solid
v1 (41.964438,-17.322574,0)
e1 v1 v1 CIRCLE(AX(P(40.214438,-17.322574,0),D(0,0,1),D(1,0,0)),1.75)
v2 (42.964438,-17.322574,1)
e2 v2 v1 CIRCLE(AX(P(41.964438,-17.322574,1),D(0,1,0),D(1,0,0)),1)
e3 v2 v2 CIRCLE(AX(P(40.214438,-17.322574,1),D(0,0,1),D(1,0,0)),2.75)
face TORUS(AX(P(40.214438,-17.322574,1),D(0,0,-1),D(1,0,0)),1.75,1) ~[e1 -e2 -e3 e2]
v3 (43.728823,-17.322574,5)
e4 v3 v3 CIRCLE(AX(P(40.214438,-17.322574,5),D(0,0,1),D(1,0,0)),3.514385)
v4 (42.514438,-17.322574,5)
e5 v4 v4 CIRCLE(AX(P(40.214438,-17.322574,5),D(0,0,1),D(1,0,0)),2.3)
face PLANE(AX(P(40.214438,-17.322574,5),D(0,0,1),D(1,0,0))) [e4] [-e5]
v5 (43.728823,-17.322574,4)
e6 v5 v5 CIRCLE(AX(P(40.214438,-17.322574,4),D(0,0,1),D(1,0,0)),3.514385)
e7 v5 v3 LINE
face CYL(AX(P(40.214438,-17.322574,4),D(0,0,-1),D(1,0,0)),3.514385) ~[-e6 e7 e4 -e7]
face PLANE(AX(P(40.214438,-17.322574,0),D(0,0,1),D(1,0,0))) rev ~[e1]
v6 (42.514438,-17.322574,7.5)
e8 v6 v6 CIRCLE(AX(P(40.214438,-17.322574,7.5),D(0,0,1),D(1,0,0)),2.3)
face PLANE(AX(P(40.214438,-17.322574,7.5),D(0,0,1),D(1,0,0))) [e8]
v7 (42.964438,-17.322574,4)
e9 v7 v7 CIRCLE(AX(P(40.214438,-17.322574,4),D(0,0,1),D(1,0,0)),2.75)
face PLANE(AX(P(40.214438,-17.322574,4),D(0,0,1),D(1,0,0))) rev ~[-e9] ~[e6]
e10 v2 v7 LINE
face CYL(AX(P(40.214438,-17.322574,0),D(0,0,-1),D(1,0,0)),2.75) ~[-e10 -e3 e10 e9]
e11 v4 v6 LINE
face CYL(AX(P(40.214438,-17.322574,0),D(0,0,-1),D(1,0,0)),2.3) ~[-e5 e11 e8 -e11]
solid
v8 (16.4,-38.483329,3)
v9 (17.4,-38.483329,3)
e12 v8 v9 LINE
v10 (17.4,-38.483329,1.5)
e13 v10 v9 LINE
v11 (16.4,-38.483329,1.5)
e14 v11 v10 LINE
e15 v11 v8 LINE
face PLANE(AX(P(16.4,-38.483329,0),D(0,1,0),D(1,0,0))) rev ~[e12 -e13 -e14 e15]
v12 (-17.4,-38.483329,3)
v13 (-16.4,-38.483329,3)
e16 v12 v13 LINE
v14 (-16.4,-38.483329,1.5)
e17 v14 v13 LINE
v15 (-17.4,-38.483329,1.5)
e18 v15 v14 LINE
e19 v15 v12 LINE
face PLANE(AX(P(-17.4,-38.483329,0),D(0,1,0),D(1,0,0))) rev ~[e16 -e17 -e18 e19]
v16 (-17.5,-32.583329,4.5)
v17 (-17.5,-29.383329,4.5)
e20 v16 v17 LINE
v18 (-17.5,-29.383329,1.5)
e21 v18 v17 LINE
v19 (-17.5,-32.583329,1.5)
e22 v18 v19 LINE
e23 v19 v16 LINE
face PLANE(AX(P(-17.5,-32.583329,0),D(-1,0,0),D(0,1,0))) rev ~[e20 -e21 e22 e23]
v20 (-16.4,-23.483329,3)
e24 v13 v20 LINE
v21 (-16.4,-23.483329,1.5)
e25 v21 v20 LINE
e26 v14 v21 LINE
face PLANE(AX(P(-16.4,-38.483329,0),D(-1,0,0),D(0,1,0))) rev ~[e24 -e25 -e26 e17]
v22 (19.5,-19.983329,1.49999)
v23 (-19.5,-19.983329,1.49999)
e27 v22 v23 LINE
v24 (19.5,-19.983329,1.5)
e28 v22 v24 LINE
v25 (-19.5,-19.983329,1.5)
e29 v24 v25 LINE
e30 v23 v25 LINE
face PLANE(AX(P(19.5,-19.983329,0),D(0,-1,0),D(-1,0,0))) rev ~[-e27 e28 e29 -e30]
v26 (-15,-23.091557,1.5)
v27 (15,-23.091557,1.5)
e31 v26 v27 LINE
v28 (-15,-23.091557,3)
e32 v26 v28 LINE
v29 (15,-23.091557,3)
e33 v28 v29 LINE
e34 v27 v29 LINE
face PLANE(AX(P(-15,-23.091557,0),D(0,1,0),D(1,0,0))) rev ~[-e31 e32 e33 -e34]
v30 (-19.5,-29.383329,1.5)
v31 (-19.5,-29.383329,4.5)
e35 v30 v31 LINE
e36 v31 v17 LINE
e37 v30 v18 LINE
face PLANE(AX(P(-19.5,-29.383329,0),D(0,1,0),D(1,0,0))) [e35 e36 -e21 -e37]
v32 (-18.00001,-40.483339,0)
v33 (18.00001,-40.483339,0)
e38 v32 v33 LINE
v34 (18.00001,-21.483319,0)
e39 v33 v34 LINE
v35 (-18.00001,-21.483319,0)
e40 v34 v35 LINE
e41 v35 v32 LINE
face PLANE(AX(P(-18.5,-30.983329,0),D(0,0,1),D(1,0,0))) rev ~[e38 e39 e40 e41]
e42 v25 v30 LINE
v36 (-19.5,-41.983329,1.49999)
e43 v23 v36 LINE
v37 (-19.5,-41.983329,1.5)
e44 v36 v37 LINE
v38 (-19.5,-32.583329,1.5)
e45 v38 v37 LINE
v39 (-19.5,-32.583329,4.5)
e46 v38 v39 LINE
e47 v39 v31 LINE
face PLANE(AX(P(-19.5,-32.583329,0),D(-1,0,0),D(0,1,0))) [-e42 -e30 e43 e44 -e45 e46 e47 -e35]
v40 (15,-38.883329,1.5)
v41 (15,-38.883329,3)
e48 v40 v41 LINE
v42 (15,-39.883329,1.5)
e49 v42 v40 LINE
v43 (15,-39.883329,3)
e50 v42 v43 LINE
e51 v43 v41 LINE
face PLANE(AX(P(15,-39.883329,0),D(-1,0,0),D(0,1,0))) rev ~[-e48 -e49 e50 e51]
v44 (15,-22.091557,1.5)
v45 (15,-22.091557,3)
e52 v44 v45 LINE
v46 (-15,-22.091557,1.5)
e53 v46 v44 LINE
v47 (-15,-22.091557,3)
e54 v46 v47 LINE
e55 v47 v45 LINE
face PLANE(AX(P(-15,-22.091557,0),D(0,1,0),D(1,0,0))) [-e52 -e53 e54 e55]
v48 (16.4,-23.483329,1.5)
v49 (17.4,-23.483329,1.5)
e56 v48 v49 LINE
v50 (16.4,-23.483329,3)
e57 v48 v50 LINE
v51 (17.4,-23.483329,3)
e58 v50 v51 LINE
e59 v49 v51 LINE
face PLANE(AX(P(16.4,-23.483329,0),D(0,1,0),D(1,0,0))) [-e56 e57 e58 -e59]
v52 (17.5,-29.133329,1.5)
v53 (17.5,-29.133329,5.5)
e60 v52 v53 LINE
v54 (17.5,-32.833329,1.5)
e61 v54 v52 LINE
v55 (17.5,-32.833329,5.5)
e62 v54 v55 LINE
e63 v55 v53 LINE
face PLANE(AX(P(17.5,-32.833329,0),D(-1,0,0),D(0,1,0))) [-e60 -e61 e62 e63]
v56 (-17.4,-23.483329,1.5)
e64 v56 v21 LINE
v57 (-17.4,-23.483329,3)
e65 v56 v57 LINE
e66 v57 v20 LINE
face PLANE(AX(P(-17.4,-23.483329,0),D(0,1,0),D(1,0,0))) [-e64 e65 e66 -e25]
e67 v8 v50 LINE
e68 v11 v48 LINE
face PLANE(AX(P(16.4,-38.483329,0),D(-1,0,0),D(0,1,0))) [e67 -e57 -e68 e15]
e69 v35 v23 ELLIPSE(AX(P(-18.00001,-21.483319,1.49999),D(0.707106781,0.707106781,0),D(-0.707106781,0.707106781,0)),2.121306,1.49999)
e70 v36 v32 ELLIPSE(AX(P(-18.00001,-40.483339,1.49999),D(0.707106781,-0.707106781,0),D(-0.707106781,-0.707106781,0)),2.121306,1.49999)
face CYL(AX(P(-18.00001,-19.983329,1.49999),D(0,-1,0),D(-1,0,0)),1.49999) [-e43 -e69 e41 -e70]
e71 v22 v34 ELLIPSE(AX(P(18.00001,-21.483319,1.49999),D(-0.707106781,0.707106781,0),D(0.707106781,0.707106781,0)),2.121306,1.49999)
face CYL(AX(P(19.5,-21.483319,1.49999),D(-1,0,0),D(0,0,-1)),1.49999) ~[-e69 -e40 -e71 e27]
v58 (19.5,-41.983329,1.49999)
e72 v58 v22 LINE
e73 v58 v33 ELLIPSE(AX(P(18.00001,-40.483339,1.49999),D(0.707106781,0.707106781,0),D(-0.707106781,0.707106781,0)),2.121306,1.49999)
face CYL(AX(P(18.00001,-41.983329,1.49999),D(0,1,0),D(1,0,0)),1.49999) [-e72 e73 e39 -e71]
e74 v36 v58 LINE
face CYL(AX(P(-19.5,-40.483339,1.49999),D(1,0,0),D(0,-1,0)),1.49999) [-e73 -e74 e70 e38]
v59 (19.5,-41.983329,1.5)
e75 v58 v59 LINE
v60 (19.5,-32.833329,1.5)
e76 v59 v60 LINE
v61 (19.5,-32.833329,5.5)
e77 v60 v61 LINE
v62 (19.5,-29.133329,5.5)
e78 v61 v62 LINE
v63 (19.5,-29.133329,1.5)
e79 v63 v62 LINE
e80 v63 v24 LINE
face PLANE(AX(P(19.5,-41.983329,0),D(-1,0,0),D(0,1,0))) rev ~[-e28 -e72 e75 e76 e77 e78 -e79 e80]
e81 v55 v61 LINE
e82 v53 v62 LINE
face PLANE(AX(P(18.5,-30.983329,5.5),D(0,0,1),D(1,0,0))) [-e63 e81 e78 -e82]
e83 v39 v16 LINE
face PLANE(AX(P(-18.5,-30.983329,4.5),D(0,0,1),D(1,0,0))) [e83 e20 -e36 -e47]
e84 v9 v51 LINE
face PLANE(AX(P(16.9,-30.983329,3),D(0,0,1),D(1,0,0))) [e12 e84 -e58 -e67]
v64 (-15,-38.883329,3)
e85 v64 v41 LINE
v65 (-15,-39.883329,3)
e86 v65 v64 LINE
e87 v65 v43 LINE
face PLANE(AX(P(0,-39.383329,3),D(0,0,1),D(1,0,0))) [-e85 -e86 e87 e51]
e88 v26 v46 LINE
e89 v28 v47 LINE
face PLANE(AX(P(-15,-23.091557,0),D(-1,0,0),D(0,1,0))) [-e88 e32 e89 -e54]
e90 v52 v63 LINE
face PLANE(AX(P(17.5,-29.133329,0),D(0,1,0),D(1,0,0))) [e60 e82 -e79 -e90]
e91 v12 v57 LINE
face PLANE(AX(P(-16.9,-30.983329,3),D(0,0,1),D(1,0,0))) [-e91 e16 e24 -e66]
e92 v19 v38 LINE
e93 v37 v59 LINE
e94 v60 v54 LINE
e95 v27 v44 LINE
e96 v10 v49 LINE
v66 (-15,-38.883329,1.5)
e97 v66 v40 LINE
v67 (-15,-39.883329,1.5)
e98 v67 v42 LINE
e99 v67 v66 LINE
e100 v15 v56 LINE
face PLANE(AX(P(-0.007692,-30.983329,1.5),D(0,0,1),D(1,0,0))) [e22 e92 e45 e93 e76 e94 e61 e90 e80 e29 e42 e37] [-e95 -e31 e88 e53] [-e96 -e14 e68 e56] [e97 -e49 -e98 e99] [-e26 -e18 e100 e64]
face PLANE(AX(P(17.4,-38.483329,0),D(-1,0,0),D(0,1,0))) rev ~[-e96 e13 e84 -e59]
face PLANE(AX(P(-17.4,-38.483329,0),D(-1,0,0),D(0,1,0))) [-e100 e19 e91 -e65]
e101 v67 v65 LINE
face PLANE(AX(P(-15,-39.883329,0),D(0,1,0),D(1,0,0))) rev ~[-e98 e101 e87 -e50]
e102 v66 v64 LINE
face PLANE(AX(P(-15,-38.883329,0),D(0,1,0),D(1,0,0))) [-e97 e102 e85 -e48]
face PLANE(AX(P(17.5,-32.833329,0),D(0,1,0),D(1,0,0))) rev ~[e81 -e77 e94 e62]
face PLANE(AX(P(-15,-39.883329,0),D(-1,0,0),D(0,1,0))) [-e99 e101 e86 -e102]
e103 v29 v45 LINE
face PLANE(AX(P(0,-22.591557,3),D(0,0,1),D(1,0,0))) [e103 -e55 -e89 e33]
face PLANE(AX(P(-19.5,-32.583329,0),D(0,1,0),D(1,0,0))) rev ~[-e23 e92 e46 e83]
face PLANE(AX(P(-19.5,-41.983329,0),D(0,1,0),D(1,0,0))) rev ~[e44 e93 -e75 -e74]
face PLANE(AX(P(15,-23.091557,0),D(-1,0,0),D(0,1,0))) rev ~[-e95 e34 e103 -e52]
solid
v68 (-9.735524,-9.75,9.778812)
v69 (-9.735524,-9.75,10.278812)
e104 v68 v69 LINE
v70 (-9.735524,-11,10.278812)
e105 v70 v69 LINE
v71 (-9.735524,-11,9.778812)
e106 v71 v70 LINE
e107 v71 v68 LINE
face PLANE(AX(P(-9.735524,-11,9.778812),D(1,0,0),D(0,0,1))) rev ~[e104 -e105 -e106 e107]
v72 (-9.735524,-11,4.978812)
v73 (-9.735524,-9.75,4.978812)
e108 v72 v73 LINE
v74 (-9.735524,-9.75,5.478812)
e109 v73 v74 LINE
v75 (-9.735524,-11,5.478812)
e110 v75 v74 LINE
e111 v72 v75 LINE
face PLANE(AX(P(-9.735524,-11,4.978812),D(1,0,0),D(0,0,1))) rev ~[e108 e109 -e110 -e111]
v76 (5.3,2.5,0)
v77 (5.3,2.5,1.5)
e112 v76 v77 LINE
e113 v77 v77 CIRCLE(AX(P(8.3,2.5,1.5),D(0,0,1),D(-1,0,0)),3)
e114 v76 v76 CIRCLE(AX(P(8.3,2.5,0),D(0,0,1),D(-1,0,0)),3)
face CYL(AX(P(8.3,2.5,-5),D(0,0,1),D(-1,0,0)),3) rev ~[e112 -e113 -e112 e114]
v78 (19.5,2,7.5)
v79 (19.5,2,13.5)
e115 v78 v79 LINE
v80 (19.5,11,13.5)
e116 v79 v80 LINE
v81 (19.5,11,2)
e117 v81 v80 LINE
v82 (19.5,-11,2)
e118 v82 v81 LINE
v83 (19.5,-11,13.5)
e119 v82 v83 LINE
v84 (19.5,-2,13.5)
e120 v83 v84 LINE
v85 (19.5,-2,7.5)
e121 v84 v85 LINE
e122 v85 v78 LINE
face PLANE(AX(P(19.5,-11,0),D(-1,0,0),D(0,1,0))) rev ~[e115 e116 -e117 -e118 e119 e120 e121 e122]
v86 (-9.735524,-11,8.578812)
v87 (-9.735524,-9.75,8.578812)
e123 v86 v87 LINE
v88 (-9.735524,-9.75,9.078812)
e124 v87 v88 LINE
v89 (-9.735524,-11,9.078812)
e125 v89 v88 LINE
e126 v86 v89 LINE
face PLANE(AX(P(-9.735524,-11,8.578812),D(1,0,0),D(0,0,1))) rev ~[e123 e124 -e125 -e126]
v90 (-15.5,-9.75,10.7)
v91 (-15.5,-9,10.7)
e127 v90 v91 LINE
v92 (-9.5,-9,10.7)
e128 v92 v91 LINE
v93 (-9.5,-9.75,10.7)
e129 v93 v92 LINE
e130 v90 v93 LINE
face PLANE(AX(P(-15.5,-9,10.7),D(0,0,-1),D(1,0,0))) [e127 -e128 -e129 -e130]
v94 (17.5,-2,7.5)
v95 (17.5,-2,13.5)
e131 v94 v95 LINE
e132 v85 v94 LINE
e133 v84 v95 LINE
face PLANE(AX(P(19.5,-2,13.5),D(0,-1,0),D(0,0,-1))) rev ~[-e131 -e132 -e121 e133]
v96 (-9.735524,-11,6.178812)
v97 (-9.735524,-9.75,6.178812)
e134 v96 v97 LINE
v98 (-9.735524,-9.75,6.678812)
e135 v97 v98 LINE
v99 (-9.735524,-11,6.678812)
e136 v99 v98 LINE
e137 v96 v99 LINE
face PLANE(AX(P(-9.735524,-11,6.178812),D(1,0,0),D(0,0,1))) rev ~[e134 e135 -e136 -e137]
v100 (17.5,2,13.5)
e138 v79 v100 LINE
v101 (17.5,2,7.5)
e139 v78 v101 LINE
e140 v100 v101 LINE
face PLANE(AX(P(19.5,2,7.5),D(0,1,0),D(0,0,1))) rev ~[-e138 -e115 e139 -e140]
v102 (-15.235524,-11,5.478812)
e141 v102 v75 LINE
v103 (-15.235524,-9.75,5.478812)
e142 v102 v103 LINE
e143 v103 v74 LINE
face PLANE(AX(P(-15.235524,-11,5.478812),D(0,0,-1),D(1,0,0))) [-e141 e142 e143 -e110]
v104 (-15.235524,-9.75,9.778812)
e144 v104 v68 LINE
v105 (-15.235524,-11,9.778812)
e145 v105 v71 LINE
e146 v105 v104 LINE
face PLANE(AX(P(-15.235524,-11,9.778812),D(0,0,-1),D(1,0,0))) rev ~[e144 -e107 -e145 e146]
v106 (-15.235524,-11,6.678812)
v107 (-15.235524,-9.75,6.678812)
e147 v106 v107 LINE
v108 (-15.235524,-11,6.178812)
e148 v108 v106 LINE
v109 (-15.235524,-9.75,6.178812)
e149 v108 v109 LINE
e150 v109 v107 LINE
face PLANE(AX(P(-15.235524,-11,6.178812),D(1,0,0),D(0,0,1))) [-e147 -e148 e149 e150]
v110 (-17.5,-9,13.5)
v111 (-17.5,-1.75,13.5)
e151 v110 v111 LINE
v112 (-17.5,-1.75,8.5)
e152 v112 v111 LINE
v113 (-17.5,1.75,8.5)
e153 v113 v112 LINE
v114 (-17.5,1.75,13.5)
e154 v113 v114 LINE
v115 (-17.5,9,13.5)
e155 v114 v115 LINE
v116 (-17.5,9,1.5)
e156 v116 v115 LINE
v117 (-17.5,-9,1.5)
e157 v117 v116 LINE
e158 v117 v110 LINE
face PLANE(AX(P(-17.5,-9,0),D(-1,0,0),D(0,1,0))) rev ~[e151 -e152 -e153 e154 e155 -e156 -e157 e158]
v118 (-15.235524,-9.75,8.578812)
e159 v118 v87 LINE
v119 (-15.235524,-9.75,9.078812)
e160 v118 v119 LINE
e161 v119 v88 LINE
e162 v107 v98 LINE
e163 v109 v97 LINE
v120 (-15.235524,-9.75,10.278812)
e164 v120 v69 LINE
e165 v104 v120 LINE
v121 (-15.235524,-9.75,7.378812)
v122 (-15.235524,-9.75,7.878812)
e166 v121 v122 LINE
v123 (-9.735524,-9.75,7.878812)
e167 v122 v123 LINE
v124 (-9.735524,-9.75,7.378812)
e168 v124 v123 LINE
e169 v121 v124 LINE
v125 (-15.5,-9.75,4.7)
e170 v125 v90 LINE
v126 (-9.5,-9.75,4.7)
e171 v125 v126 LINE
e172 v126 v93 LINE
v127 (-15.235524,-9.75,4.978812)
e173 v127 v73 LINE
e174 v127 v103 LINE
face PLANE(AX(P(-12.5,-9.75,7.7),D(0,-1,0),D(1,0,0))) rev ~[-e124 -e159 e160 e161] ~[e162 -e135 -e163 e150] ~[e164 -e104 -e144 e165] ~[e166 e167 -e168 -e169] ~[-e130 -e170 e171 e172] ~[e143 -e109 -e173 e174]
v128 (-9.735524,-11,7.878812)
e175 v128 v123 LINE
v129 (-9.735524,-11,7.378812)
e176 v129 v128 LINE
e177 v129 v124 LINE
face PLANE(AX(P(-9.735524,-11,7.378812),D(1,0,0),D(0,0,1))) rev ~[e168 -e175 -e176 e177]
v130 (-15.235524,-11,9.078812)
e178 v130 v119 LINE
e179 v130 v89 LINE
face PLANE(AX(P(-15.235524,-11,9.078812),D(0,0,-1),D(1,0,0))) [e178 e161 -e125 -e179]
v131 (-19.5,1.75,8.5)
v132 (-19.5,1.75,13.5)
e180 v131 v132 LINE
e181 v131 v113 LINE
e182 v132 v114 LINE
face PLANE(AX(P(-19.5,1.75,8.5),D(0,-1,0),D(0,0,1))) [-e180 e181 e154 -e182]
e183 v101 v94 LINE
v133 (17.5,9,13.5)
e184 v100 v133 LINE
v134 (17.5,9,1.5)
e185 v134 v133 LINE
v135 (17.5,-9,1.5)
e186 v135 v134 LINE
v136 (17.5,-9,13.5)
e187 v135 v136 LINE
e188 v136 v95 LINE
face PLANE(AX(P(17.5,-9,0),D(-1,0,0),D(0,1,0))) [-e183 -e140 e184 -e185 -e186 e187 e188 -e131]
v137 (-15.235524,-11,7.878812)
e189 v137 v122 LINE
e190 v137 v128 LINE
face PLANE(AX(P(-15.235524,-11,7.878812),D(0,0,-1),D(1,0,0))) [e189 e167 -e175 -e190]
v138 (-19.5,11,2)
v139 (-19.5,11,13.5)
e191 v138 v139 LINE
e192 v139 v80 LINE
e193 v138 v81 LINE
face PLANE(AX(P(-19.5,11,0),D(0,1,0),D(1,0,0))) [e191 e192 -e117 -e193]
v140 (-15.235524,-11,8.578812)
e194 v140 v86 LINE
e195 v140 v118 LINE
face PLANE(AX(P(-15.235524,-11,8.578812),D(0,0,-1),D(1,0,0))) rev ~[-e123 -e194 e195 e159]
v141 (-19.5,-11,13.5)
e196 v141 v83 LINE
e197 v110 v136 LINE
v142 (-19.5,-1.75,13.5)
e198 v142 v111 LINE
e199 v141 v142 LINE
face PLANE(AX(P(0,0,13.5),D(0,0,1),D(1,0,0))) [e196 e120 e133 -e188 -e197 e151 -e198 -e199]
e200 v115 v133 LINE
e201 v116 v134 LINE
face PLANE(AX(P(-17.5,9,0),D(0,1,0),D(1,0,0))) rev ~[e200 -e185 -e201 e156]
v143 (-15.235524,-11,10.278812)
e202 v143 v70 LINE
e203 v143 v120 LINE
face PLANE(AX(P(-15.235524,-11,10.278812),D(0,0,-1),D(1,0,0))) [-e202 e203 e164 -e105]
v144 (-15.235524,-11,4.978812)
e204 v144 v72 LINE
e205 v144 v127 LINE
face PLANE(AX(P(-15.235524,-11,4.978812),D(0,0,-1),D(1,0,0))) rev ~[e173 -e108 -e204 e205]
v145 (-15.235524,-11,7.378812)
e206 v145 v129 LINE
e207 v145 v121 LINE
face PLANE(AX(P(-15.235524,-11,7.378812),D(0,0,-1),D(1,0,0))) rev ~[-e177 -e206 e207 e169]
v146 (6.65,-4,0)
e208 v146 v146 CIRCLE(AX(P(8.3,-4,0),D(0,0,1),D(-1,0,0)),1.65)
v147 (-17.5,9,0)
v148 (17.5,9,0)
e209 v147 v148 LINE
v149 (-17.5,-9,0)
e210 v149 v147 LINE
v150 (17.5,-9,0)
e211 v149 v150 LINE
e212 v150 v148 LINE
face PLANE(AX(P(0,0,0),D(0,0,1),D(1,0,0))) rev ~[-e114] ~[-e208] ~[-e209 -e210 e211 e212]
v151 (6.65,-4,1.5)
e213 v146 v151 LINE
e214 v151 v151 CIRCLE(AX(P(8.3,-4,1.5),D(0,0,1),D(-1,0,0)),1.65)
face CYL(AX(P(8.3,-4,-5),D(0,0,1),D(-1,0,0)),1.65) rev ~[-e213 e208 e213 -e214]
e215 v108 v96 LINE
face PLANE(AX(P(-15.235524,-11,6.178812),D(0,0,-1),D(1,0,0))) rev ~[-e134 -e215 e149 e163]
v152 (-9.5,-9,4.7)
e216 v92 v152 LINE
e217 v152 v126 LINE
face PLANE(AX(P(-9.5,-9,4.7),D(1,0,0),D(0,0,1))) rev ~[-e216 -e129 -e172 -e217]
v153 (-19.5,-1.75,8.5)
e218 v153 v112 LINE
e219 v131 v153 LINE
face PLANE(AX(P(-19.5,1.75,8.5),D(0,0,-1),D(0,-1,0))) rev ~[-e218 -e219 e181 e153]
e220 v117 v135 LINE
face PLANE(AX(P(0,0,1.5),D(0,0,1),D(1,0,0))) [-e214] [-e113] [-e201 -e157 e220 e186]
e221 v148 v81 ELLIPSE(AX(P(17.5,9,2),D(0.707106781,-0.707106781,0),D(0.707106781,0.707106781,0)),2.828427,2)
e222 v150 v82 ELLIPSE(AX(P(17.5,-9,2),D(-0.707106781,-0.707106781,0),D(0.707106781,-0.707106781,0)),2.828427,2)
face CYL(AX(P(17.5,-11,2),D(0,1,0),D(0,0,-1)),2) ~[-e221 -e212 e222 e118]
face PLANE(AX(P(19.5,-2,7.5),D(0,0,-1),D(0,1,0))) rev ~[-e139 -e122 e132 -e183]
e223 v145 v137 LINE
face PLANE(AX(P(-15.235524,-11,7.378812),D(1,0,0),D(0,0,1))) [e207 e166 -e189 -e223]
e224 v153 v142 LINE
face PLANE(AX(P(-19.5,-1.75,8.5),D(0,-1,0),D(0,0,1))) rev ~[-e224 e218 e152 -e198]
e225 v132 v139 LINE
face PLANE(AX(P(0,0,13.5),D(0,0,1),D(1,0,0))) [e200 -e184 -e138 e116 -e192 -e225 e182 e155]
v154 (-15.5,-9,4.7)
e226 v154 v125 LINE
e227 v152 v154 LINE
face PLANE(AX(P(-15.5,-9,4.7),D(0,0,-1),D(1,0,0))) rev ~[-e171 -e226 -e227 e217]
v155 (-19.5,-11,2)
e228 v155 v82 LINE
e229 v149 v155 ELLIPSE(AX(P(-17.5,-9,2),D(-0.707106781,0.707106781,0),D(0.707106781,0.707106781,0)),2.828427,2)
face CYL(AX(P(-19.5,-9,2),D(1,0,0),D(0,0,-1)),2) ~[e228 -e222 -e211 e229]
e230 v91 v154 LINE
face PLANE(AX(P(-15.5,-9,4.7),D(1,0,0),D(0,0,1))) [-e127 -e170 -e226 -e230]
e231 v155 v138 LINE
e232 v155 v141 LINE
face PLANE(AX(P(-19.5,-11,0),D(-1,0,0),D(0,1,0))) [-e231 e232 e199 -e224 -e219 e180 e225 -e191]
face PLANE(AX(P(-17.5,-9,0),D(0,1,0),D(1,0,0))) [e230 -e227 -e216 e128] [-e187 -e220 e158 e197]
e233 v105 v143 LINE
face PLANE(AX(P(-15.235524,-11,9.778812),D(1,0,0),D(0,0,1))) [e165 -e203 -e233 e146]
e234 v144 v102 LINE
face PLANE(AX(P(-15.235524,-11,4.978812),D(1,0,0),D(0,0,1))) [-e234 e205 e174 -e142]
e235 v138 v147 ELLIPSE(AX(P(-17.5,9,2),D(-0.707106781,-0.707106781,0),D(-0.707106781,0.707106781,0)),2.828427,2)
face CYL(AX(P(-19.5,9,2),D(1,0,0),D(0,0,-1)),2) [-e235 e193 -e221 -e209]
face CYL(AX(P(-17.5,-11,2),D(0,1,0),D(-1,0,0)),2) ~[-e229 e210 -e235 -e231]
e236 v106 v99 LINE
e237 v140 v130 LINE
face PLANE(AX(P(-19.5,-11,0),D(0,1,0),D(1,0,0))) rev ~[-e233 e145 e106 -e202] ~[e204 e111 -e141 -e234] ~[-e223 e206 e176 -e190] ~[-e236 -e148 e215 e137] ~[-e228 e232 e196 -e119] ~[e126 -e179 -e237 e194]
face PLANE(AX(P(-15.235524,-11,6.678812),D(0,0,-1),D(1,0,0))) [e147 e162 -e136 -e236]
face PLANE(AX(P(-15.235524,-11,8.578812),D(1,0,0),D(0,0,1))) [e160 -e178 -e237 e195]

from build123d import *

# Parameters (mm, degrees)
F0_W      = 35
F0_H      = 18
F1_DEPTH  = 1.5
F0_W_2    = 39
F0_H_2    = 22
F2_DEPTH  = 13.5
F3_D      = 3.3
F3_DEPTH  = 5
F3_TIP    = 0.9914200214
F5_D      = 6
F5_DEPTH  = 5
F5_TIP    = 1.8025818571
F7_R      = 2.3
F8_DEPTH  = 7.5
F7_R_2    = 2.75
F9_DEPTH  = 4
F10_R     = 1
F11_R     = 3.5143854074
F11_R_2   = 2.75
F11_R_3   = 2.3
F12_DEPTH = 1
F14_W     = 6
F14_H     = 6
F15_DEPTH = 0.75
F16_W     = 3.5
F16_H     = 5
F17_DEPTH = 5
F18_W     = 1
F18_H     = 15
F18_W_2   = 30
F18_H_2   = 1
F19_DEPTH = 1.5
F20_DEPTH = 3
F6_W      = 4
F6_H      = 2
F6_H_2    = 4
F21_DEPTH = 5
F18_W_3   = 2
F18_H_3   = 3.7
F22_DEPTH = 5.5
F23_W     = 5.5
F23_H     = 0.5
F24_DEPTH = 5
F18_H_4   = 3.2
F25_DEPTH = 4.5
F26_R     = 2
F27_R     = 1.49999


# Not quite as in the source:
# - a fillet or chamfer is up to 0.001 mm smaller than in the source, because OpenCascade refuses the exact size
# - a feature names something its author has since deleted; it is built from what else it names


with BuildPart() as f1:
    # F0 (on Top) → F1 (new body)
    with BuildSketch(Plane.XY):
        Rectangle(F0_W, F0_H)
    extrude(amount=F1_DEPTH)

    # F0 (on Top) → F2 (join)
    with BuildSketch(Plane.XY):
        Rectangle(F0_W_2, F0_H_2)
        Rectangle(F0_W, F0_H, mode=Mode.SUBTRACT)
    extrude(amount=F2_DEPTH)

    # F3
    with Locations(Plane(origin=(0, 0, 0), x_dir=(1, 0, 0), z_dir=(0, 0, -1))):
        with Locations((8.3, 4)):
            Hole(F3_D / 2, depth=F3_DEPTH)
            with Locations((0, 0, -(F3_DEPTH + F3_TIP / 2))):  # 118° drill point
                Cone(0, F3_D / 2, F3_TIP, mode=Mode.SUBTRACT)

    # F5
    with Locations(Plane(origin=(0, 0, 0), x_dir=(1, 0, 0), z_dir=(0, 0, -1))):
        with Locations((8.3, -2.5)):
            Hole(F5_D / 2, depth=F5_DEPTH)
            with Locations((0, 0, -(F5_DEPTH + F5_TIP / 2))):  # 118° drill point
                Cone(0, F5_D / 2, F5_TIP, mode=Mode.SUBTRACT)

    # F14 (on offset) → F15 (cut, symmetric)
    with BuildSketch(Plane.XZ.offset(9)):
        with Locations((-12.5, 7.7)):
            Rectangle(F14_W, F14_H)
    extrude(amount=F15_DEPTH, both=True, mode=Mode.SUBTRACT)

    # F16 (on face) → F17 (cut)
    with BuildSketch(Plane(origin=(-19.5, 0, 0), x_dir=(0, -1, 0), z_dir=(-1, 0, 0))):
        with Locations((0, 11)):
            Rectangle(F16_W, F16_H)
    extrude(amount=-F17_DEPTH, mode=Mode.SUBTRACT)

    # F6 (on face) → F21 (cut)
    with BuildSketch(Plane.YZ.offset(19.5)):
        with Locations((0, 8.5)):
            Rectangle(F6_W, F6_H)
        with Locations((0, 11.5)):
            Rectangle(F6_W, F6_H_2)
    extrude(amount=-F21_DEPTH, mode=Mode.SUBTRACT)

    # F23 (on face) → F24 (cut)
    with BuildSketch(Plane.XZ.offset(11)):
        with Locations((-12.4855237082, 5.2288122736)):
            Rectangle(F23_W, F23_H)
        with Locations((-12.4855237082, 6.4288122736)):
            Rectangle(F23_W, F23_H)
        with Locations((-12.4855237082, 7.6288122736)):
            Rectangle(F23_W, F23_H)
        with Locations((-12.4855237082, 8.8288122736)):
            Rectangle(F23_W, F23_H)
        with Locations((-12.4855237082, 10.0288122736)):
            Rectangle(F23_W, F23_H)
    extrude(amount=-F24_DEPTH, mode=Mode.SUBTRACT)

    # F26
    f26_edges = [f1.edges().sort_by_distance(p)[0] for p in [
        (0, -11, 0),
        (-19.5, 0, 0),
        (19.5, 0, 0),
        (0, 11, 0),
    ]]
    fillet(f26_edges, radius=F26_R)


with BuildPart() as f8:
    # F7 (on Top) → F8 (new body)
    with BuildSketch(Plane.XY):
        with Locations((40.214437741, -17.3225737277)):
            Circle(F7_R)
    extrude(amount=F8_DEPTH)

    # F7 (on Top) → F9 (join)
    with BuildSketch(Plane.XY):
        with Locations((40.214437741, -17.3225737277)):
            Circle(F7_R_2)
        with Locations((40.214437741, -17.3225737277)):
            Circle(F7_R, mode=Mode.SUBTRACT)
    extrude(amount=F9_DEPTH)

    # F10
    f10_edges = [f8.edges().sort_by_distance(p)[0] for p in [
        (37.464438, -17.322574, 0),
    ]]
    fillet(f10_edges, radius=F10_R)

    # F11 (on face) → F12 (join)
    with BuildSketch(Plane.XY.offset(4)):
        with Locations((40.214437741, -17.3225737277)):
            Circle(F11_R)
        with Locations((40.214437741, -17.3225737277)):
            Circle(F11_R_2, mode=Mode.SUBTRACT)
        with Locations((40.214437741, -17.3225737277)):
            Circle(F11_R_2)
        with Locations((40.214437741, -17.3225737277)):
            Circle(F11_R_3, mode=Mode.SUBTRACT)
    extrude(amount=F12_DEPTH)


with BuildPart() as f19:
    # F18 (on Top) → F19 (new body)
    with BuildSketch(Plane.XY):
        Polygon((-19.5, -41.9833288193), (19.5, -41.9833288193), (19.5, -32.8333288193), (17.5, -32.8333288193), (17.5, -29.1333288193), (19.5, -29.1333288193), (19.5, -19.9833288193), (-19.5, -19.9833288193), (-19.5, -29.3833288193), (-17.5, -29.3833288193), (-17.5, -32.5833288193), (-19.5, -32.5833288193), align=None)
        with Locations((-16.9, -30.9833288193)):
            Rectangle(F18_W, F18_H, mode=Mode.SUBTRACT)
        with Locations((0, -39.3833288193)):
            Rectangle(F18_W_2, F18_H_2, mode=Mode.SUBTRACT)
        with Locations((16.9, -30.9833288193)):
            Rectangle(F18_W, F18_H, mode=Mode.SUBTRACT)
        with Locations((0, -22.5915573537)):
            Rectangle(F18_W_2, F18_H_2, mode=Mode.SUBTRACT)
    extrude(amount=F19_DEPTH)

    # F18 (on Top) → F20 (join)
    with BuildSketch(Plane.XY):
        with Locations((0, -22.5915573537)):
            Rectangle(F18_W_2, F18_H_2)
        with Locations((-16.9, -30.9833288193)):
            Rectangle(F18_W, F18_H)
        with Locations((0, -39.3833288193)):
            Rectangle(F18_W_2, F18_H_2)
        with Locations((16.9, -30.9833288193)):
            Rectangle(F18_W, F18_H)
    extrude(amount=F20_DEPTH)

    # F18 (on Top) → F22 (join)
    with BuildSketch(Plane.XY):
        with Locations((18.5, -30.9833288193)):
            Rectangle(F18_W_3, F18_H_3)
    extrude(amount=F22_DEPTH)

    # F18 (on Top) → F25 (join)
    with BuildSketch(Plane.XY):
        with Locations((-18.5, -30.9833288193)):
            Rectangle(F18_W_3, F18_H_4)
    extrude(amount=F25_DEPTH)

    # F27 (radius 1.5 in the source; OpenCascade refuses exactly that, so slightly less here)
    f27_edges = [f19.edges().sort_by_distance(p)[0] for p in [
        (19.5, -30.983329, 0),
        (0, -19.983329, 0),
        (-19.5, -30.983329, 0),
        (0, -41.983329, 0),
    ]]
    fillet(f27_edges, radius=F27_R)


solid = Compound([f1.part, f8.part, f19.part])
